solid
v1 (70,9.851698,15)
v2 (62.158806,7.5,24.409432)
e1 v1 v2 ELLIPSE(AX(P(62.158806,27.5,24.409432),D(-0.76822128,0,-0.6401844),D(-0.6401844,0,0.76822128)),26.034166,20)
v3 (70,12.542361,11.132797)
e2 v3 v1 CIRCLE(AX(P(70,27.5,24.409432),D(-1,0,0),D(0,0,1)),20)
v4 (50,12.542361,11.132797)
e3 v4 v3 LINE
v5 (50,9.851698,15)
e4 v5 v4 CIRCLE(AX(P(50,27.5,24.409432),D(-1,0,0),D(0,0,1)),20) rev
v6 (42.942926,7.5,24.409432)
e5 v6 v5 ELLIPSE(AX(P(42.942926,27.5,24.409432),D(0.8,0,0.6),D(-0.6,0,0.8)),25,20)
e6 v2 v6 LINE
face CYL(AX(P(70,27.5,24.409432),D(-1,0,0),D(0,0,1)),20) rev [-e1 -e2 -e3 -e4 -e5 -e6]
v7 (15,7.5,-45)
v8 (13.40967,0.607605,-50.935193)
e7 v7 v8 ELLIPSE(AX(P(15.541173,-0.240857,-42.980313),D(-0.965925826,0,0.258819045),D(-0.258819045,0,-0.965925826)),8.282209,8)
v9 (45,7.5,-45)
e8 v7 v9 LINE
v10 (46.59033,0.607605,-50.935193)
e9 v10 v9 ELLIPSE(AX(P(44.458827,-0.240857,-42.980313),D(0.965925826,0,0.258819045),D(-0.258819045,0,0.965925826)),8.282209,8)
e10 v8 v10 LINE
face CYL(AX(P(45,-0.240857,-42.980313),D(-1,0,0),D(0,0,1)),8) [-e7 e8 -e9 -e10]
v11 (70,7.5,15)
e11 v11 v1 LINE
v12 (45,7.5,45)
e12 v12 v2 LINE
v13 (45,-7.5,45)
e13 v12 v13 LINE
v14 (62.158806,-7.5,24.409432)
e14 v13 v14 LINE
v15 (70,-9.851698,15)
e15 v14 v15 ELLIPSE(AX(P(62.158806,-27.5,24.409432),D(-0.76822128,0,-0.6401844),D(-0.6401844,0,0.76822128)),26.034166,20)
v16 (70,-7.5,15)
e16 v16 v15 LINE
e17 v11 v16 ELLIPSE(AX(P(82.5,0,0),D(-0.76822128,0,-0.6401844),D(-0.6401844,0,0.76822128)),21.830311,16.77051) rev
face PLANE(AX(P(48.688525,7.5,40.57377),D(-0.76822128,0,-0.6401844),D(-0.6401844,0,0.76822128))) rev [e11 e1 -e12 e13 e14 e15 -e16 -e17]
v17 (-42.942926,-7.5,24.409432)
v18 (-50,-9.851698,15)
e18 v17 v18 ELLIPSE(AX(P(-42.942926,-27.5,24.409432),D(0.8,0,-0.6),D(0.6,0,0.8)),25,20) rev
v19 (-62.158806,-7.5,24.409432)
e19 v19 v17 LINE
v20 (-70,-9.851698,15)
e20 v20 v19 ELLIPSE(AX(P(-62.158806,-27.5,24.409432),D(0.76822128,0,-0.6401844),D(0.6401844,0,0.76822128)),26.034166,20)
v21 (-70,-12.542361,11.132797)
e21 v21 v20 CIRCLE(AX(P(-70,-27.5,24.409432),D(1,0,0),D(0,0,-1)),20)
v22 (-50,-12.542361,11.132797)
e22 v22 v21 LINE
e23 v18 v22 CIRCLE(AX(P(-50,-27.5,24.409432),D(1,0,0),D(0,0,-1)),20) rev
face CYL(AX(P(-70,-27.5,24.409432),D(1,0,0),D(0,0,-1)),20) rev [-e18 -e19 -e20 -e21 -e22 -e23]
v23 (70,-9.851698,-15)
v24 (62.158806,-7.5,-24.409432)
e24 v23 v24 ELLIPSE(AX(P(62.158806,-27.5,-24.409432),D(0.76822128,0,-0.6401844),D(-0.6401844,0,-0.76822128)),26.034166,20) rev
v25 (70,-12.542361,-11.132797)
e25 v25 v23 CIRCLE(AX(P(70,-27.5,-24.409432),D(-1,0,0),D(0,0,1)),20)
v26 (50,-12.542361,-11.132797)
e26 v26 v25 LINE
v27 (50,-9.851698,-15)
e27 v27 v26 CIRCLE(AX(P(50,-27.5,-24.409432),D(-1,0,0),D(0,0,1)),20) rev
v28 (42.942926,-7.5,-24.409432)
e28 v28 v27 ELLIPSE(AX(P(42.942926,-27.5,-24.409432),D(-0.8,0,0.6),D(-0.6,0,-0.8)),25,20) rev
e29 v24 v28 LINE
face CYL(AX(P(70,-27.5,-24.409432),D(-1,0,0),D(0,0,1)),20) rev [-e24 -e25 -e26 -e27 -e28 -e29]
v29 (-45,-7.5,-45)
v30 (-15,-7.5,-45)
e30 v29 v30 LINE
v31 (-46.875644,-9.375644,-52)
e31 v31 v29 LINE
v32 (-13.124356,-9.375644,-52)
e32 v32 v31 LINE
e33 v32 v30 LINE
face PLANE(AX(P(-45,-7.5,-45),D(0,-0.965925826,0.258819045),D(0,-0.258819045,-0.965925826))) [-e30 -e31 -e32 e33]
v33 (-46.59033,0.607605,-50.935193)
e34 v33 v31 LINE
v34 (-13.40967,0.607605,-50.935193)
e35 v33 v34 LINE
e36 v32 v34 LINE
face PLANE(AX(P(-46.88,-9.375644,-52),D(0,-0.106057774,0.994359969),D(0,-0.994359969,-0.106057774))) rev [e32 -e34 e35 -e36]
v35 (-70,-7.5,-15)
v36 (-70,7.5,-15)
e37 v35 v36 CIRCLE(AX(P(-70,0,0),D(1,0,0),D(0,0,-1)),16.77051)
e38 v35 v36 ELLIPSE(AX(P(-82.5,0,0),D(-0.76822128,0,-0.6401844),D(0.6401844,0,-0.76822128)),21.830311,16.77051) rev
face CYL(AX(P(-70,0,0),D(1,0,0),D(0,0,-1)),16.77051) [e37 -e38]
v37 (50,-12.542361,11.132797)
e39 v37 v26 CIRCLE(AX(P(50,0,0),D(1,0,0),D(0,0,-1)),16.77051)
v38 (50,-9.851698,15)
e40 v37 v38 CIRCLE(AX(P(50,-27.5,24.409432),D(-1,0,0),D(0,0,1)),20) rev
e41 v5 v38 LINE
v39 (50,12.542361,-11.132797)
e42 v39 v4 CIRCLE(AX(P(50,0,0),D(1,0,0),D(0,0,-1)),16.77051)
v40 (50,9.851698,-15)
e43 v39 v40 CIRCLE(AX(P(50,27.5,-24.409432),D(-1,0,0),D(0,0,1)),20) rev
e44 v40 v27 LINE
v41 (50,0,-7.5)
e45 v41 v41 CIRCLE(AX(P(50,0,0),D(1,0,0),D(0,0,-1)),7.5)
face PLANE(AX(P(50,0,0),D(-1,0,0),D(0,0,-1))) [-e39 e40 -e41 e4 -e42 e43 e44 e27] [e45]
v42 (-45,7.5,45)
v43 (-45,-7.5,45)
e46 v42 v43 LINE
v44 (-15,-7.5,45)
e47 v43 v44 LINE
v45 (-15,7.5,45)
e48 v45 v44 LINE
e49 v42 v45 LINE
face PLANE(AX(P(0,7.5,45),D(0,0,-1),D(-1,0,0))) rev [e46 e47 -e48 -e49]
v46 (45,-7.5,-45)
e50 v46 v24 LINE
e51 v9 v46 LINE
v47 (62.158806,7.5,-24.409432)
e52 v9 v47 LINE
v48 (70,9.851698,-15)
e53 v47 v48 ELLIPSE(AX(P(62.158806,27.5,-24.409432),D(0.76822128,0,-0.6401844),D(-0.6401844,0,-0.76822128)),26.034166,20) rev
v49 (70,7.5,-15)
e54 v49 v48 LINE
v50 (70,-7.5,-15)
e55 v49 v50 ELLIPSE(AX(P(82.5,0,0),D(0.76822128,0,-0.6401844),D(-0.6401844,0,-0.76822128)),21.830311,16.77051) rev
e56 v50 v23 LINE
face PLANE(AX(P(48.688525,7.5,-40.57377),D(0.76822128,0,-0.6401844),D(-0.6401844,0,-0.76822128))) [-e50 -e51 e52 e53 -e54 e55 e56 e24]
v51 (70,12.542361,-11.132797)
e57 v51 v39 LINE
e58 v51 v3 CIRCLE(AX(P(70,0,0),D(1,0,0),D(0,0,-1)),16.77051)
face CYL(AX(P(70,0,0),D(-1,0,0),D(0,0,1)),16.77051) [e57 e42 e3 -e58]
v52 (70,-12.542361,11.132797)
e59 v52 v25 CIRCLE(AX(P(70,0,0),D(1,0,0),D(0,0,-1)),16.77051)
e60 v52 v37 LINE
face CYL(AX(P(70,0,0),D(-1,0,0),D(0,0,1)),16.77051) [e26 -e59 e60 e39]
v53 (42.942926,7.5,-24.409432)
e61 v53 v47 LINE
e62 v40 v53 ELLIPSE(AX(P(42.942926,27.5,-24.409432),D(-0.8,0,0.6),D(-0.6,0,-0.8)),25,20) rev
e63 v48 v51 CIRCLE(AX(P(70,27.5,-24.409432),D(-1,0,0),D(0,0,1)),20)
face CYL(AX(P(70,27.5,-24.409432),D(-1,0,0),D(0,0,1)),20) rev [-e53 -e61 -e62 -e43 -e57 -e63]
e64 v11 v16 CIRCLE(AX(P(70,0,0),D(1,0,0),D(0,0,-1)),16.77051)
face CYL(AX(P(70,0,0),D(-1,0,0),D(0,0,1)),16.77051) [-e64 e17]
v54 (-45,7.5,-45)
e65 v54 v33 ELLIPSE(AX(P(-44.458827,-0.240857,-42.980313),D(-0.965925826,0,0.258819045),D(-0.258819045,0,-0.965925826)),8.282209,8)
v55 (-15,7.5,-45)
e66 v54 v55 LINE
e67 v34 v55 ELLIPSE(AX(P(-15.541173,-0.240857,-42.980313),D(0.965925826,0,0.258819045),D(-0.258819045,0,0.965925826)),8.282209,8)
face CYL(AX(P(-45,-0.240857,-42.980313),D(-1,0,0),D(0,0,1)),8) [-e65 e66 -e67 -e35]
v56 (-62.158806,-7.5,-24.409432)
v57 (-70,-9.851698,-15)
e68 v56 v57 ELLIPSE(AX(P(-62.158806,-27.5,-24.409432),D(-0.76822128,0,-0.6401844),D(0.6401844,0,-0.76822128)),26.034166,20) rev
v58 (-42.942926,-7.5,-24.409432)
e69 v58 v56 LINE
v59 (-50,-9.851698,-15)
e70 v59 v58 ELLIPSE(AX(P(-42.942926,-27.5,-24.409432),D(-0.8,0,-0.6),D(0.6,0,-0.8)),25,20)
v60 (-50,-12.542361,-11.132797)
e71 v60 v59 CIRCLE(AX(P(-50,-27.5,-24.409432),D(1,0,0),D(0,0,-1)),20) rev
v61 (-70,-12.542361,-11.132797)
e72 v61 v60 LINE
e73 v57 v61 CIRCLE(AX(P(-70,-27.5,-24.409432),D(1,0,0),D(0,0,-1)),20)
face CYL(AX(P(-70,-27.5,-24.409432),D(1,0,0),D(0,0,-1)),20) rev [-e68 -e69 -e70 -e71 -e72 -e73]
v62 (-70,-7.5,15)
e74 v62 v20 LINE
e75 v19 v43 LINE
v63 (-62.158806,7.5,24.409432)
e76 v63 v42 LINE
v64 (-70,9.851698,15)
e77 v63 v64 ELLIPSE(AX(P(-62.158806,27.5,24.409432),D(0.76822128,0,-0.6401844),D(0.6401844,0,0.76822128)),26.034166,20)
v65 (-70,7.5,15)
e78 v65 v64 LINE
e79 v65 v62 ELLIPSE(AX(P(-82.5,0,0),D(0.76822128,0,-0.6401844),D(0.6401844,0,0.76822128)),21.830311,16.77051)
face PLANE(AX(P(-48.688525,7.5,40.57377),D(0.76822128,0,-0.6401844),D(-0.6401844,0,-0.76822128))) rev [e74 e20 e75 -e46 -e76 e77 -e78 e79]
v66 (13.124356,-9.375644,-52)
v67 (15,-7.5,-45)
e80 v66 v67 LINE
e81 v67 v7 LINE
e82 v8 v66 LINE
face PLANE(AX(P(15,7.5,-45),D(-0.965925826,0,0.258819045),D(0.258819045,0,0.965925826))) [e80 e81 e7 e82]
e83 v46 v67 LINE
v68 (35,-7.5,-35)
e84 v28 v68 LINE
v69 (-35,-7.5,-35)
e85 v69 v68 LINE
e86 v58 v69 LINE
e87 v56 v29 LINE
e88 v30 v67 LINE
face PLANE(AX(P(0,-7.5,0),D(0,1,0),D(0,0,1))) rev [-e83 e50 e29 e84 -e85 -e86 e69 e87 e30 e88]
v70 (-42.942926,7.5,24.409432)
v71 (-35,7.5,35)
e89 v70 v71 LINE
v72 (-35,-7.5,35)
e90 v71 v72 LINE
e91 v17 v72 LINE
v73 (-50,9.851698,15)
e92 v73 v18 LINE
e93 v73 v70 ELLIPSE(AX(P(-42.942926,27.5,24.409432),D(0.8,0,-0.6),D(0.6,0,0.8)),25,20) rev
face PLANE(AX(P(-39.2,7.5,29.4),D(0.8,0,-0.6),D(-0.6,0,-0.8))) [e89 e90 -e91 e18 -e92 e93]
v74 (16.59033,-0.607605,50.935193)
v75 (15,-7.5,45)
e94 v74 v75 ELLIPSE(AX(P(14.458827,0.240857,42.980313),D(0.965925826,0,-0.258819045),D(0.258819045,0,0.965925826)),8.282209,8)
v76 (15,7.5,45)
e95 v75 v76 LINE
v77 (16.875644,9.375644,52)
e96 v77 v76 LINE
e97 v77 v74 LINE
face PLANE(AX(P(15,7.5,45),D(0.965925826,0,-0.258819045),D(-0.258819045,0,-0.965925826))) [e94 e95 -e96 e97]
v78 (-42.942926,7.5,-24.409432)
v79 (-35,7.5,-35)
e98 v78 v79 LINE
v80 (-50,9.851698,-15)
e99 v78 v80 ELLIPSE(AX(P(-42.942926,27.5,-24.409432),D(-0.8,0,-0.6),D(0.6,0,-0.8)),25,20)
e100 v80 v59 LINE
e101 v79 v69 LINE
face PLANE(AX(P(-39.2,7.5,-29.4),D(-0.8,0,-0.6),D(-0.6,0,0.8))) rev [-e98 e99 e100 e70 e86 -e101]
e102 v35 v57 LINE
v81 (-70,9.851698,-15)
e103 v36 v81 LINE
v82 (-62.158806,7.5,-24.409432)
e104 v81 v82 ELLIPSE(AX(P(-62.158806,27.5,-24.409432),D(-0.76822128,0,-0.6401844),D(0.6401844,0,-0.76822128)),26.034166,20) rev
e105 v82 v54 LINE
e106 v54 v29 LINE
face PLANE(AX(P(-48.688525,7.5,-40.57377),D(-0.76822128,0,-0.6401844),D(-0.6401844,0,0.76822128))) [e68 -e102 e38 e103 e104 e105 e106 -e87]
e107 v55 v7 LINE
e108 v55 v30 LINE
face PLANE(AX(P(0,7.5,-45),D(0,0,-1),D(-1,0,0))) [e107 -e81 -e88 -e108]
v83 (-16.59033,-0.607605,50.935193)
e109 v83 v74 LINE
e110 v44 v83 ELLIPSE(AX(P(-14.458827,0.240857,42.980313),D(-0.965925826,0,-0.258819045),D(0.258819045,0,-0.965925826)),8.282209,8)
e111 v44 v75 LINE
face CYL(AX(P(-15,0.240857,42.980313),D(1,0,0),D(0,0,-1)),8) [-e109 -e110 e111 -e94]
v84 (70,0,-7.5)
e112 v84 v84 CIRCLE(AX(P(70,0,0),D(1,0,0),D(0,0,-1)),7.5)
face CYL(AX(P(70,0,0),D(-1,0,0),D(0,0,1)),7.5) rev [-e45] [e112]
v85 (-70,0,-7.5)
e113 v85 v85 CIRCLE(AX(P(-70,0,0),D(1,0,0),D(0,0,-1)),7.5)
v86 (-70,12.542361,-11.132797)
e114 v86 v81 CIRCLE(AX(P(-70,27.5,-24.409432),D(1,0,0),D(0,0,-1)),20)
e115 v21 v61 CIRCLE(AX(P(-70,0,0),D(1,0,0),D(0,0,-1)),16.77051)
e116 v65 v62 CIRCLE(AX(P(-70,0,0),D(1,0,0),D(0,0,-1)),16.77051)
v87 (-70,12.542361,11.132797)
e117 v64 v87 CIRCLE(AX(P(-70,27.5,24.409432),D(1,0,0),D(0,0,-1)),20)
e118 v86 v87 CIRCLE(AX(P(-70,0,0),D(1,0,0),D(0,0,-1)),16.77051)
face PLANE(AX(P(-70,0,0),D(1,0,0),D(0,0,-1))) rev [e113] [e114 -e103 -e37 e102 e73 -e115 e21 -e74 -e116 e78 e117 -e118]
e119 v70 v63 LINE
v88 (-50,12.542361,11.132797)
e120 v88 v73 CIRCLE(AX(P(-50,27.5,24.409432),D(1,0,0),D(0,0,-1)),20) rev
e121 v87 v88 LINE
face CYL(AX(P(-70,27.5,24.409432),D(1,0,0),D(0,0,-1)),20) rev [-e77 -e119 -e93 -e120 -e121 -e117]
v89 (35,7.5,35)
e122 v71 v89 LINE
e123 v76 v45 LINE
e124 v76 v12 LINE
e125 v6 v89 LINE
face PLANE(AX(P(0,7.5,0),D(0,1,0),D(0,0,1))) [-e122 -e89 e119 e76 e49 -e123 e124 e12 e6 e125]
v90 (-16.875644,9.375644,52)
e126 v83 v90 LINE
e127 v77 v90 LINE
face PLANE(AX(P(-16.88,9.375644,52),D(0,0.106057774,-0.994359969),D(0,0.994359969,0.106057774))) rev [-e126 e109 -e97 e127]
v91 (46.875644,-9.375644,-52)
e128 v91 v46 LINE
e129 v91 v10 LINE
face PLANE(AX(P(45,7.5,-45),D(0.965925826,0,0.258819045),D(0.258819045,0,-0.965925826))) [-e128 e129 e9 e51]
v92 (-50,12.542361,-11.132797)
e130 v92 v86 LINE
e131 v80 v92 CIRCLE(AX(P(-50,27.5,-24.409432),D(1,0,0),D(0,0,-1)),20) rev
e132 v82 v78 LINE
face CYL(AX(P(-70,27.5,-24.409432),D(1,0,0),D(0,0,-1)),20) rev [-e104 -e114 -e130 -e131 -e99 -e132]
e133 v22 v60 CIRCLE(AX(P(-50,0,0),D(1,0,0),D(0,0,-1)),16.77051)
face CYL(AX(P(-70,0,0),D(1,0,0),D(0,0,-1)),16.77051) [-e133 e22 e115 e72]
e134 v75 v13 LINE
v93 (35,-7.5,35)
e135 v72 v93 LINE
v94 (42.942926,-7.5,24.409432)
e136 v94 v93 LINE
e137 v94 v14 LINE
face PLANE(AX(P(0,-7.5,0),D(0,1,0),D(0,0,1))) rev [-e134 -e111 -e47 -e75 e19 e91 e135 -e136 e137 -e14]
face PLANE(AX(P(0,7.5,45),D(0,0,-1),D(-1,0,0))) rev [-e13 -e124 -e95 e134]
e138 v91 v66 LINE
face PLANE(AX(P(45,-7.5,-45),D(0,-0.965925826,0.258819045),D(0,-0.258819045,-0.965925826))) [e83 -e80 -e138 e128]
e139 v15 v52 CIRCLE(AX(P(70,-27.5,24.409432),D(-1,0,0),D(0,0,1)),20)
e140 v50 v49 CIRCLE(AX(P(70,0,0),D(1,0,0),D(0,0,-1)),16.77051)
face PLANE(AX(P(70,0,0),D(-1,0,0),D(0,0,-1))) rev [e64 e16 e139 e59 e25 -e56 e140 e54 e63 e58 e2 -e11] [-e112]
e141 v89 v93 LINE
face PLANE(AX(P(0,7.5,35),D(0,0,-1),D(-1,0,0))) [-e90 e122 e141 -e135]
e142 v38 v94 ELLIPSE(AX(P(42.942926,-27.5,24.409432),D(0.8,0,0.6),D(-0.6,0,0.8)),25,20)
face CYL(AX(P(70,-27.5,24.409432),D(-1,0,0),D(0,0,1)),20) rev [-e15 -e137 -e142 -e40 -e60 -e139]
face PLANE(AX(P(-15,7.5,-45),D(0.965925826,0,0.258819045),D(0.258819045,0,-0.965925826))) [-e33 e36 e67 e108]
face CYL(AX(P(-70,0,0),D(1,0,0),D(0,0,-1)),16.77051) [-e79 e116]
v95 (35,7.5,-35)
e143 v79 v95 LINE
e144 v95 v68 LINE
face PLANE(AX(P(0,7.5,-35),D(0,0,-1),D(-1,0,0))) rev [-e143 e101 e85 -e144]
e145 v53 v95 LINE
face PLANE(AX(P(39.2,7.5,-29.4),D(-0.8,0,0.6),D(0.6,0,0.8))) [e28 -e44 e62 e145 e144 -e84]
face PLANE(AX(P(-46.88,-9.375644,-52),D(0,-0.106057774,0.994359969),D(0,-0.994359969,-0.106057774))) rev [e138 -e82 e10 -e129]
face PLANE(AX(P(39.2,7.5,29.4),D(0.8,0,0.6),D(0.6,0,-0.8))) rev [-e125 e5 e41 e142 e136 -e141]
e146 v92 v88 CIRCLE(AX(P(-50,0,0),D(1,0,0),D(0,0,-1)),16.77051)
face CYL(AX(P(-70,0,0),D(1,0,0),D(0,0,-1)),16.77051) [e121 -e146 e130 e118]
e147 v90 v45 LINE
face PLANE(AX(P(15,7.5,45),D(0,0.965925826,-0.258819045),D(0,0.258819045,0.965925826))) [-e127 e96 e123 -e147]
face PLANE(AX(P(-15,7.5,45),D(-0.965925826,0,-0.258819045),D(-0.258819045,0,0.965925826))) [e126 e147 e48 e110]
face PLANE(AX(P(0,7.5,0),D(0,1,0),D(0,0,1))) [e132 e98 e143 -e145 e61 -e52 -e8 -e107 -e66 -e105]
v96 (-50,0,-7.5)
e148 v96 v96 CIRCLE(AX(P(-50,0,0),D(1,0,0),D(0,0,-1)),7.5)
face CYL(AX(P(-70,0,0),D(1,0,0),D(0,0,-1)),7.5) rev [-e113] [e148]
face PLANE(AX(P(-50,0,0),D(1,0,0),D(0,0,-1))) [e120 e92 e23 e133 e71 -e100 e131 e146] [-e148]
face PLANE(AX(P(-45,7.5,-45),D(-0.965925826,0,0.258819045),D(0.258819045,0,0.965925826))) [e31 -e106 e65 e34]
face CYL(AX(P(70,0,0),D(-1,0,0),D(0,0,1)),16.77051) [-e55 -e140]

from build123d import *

# Parameters (mm, degrees)
RESSALTO_EXTRUS_O1_DEPTH           = 7.5
RESSALTO_EXTRUS_O1_2_DEPTH         = 7.5
ESBO_O2_R                          = 16.770509831
ESBO_O2_R_2                        = 7.5
RESSALTO_EXTRUS_O2_DEPTH           = 20
FILETE1_R                          = 20
ESBO_O3_W                          = 30
ESBO_O3_H                          = 15
RESSALTO_EXTRUS_O3_DEPTH           = 7
RESSALTO_EXTRUS_O3_DRAFT           = -15
ESBO_O4_W                          = 30
ESBO_O4_H                          = 15
RESSALTO_EXTRUS_O4_DEPTH           = 7
RESSALTO_EXTRUS_O4_DRAFT           = -15
RESSALTO_EXTRUS_O4_PROFILE_2_DEPTH = 7
RESSALTO_EXTRUS_O4_PROFILE_2_DRAFT = -15
CORTE_EXTRUS_O1_DEPTH              = 16.88
CORTE_EXTRUS_O2_DEPTH              = 46.88
FILETE4_R                          = 8


with BuildPart() as part:
    # Esboço1 → Ressalto-extrusão1 (new, symmetric)
    with BuildSketch(Plane(origin=(0, 0, 0), x_dir=(1, 0, 0), z_dir=(0, 1, 0))):
        Polygon((45, -45), (70, -15), (50, -15), (35, -35), (-35, -35), (-50, -15), (-70, -15), (-45, -45), align=None)
    extrude(amount=RESSALTO_EXTRUS_O1_DEPTH, both=True)



with BuildPart() as body_2:
    # Esboço1 → Ressalto-extrus_o1 2 (new, symmetric)
    with BuildSketch(Plane(origin=(0, 0, 0), x_dir=(1, 0, 0), z_dir=(0, 1, 0))):
        Polygon((70, 15), (50, 15), (35, 35), (-35, 35), (-50, 15), (-70, 15), (-45, 45), (45, 45), align=None)
    extrude(amount=RESSALTO_EXTRUS_O1_2_DEPTH, both=True)


with BuildPart() as part_1:
    add(part.part)

    add(body_2.part)  # Ressalto-extrusão2 merges body 2
    # Esboço2 → Ressalto-extrusão2 (add)
    with BuildSketch(Plane(origin=(-50, 0, 0), x_dir=(0, 0, -1), z_dir=(1, 0, 0))):
        Circle(ESBO_O2_R)
        Circle(ESBO_O2_R_2, mode=Mode.SUBTRACT)
    ressalto_extrus_o2 = extrude(amount=-RESSALTO_EXTRUS_O2_DEPTH)

    # Espelhar1: Ressalto-extrusão2 across plane
    add(ressalto_extrus_o2.mirror(Plane(origin=(0, 0, 0), x_dir=(0, 0, 1), z_dir=(1, 0, 0))))

    # Filete1
    # the kernel refuses this fillet: 20 mm, written as the material it adds along each edge
    with BuildSketch(Plane(origin=(70, -7.5, 15), x_dir=(0, 0, 1), z_dir=(-1, 0, 0))) as filete1_piece_1_section:
        with BuildLine():
            CenterArc((9.409432465, -20), FILETE1_R, 90, 41.59276394)
            ThreePointArc((-3.867202848, -5.042361324), (-1.692591399, -2.706021572), (0, 0))
            Line((0, 0), (9.409432465, 0))
        make_face()
    filete1_piece_1 = extrude(amount=20, mode=Mode.PRIVATE)
    filete1_piece_1 = split(filete1_piece_1, bisect_by=Plane(origin=(64.976467601, -8.579836869, 21.028238879), z_dir=(-0.7682212795973759, 0, -0.6401843996644799)), keep=Keep.TOP, mode=Mode.PRIVATE)
    filete1_piece_1 = split(filete1_piece_1, bisect_by=Plane(origin=(52.72088695, -8.579836869, 11.372150733), z_dir=(0.7999999999999996, 0, 0.6000000000000005)), keep=Keep.TOP, mode=Mode.PRIVATE)
    add(filete1_piece_1)
    with BuildSketch(Plane(origin=(70, -7.5, 15), x_dir=(0, 0, 1), z_dir=(-1, 0, 0))) as filete1_piece_2_section:
        with BuildLine():
            CenterArc((9.409432465, -20), FILETE1_R, 90, 41.59276394)
            ThreePointArc((-3.867202848, -5.042361324), (-1.692591399, -2.706021572), (0, 0))
            Line((0, 0), (9.409432465, 0))
        make_face()
    filete1_piece_2 = extrude(amount=20, mode=Mode.PRIVATE)
    filete1_piece_2 = split(filete1_piece_2, bisect_by=Plane(origin=(51.352262371, -10.660732835, 13.196983505), z_dir=(-0.7999999999999996, 0, -0.6000000000000005)), keep=Keep.TOP, mode=Mode.PRIVATE)
    add(filete1_piece_2)
    with BuildSketch(Plane(origin=(70, -7.5, 15), x_dir=(0, 0, 1), z_dir=(-1, 0, 0))) as filete1_piece_3_section:
        with BuildLine():
            CenterArc((9.409432465, -20), FILETE1_R, 90, 41.59276394)
            ThreePointArc((-3.867202848, -5.042361324), (-1.692591399, -2.706021572), (0, 0))
            Line((0, 0), (9.409432465, 0))
        make_face()
    filete1_piece_3 = extrude(amount=43.523581162, mode=Mode.PRIVATE)
    filete1_piece_3 = split(filete1_piece_3, bisect_by=Plane(origin=(46.899144186, -7.62078926, 19.134474419), z_dir=(0.7999999999999996, 0, 0.6000000000000005)), keep=Keep.TOP, mode=Mode.PRIVATE)
    filete1_piece_3 = split(filete1_piece_3, bisect_by=Plane(origin=(50, -7.62078926, 20.042041974), z_dir=(-1, 0, 0)), keep=Keep.TOP, mode=Mode.PRIVATE)
    add(filete1_piece_3)
    with BuildSketch(Plane(origin=(-26.476418838, 7.5, 15), x_dir=(0, 0.7935005396361219, -0.6085695470504449), z_dir=(-1, 0, 0))) as filete1_piece_4_section:
        with BuildLine():
            CenterArc((10.14371674, -19.637780679), FILETE1_R, 100.921092441, 41.59276394)
            Line((-5.726294053, -7.466389738), (0, 0))
            ThreePointArc((0, 0), (3.177289158, -0.303730134), (6.354578317, 0))
        make_face()
    filete1_piece_4 = extrude(amount=43.523581162, mode=Mode.PRIVATE)
    filete1_piece_4 = split(filete1_piece_4, bisect_by=Plane(origin=(-50, 7.62078926, 20.042041974), z_dir=(1, 0, 0)), keep=Keep.TOP, mode=Mode.PRIVATE)
    filete1_piece_4 = split(filete1_piece_4, bisect_by=Plane(origin=(-46.899144186, 7.62078926, 19.134474419), z_dir=(-0.7999999999999992, 0, 0.6000000000000011)), keep=Keep.TOP, mode=Mode.PRIVATE)
    add(filete1_piece_4)
    with BuildSketch(Plane(origin=(-50, 7.5, 15), x_dir=(0, 0.7935005396361215, -0.6085695470504452), z_dir=(-1, 0, 0))) as filete1_piece_5_section:
        with BuildLine():
            CenterArc((10.14371674, -19.637780679), FILETE1_R, 100.921092441, 41.59276394)
            Line((-5.726294053, -7.466389738), (0, 0))
            ThreePointArc((0, 0), (3.177289158, -0.303730134), (6.354578317, 0))
        make_face()
    filete1_piece_5 = extrude(amount=20, mode=Mode.PRIVATE)
    filete1_piece_5 = split(filete1_piece_5, bisect_by=Plane(origin=(-51.352262371, 10.660732835, 13.196983505), z_dir=(0.7999999999999992, 0, -0.6000000000000011)), keep=Keep.TOP, mode=Mode.PRIVATE)
    add(filete1_piece_5)
    with BuildSketch(Plane(origin=(-50, 7.5, 15), x_dir=(0, 0.7935005396361215, -0.6085695470504452), z_dir=(-1, 0, 0))) as filete1_piece_6_section:
        with BuildLine():
            CenterArc((10.14371674, -19.637780679), FILETE1_R, 100.921092441, 41.59276394)
            Line((-5.726294053, -7.466389738), (0, 0))
            ThreePointArc((0, 0), (3.177289158, -0.303730134), (6.354578317, 0))
        make_face()
    filete1_piece_6 = extrude(amount=20, mode=Mode.PRIVATE)
    filete1_piece_6 = split(filete1_piece_6, bisect_by=Plane(origin=(-64.976467601, 8.579836869, 21.028238879), z_dir=(0.7682212795973756, 0, -0.6401843996644802)), keep=Keep.TOP, mode=Mode.PRIVATE)
    filete1_piece_6 = split(filete1_piece_6, bisect_by=Plane(origin=(-52.72088695, 8.579836869, 11.372150733), z_dir=(-0.7999999999999992, 0, 0.6000000000000011)), keep=Keep.TOP, mode=Mode.PRIVATE)
    add(filete1_piece_6)
    with BuildSketch(Plane(origin=(70, 7.5, -15), x_dir=(0, 0.7935005396361229, 0.6085695470504434), z_dir=(-1, 0, 0))) as filete1_piece_7_section:
        with BuildLine():
            CenterArc((10.14371674, 19.637780679), FILETE1_R, 217.486143619, 41.59276394)
            Line((-5.726294053, 7.466389738), (0, 0))
            ThreePointArc((0, 0), (3.177289158, 0.303730134), (6.354578317, 0))
        make_face()
    filete1_piece_7 = extrude(amount=20, mode=Mode.PRIVATE)
    filete1_piece_7 = split(filete1_piece_7, bisect_by=Plane(origin=(52.72088695, 8.579836869, -11.372150733), z_dir=(0.7999999999999996, 0, -0.6000000000000005)), keep=Keep.TOP, mode=Mode.PRIVATE)
    filete1_piece_7 = split(filete1_piece_7, bisect_by=Plane(origin=(64.976467601, 8.579836869, -21.028238879), z_dir=(-0.7682212795973757, 0, 0.6401843996644802)), keep=Keep.TOP, mode=Mode.PRIVATE)
    add(filete1_piece_7)
    with BuildSketch(Plane(origin=(70, 7.5, -15), x_dir=(0, 0.7935005396361229, 0.6085695470504434), z_dir=(-1, 0, 0))) as filete1_piece_8_section:
        with BuildLine():
            CenterArc((10.14371674, 19.637780679), FILETE1_R, 217.486143619, 41.59276394)
            Line((-5.726294053, 7.466389738), (0, 0))
            ThreePointArc((0, 0), (3.177289158, 0.303730134), (6.354578317, 0))
        make_face()
    filete1_piece_8 = extrude(amount=43.523581162, mode=Mode.PRIVATE)
    filete1_piece_8 = split(filete1_piece_8, bisect_by=Plane(origin=(46.899144186, 7.62078926, -19.134474419), z_dir=(0.7999999999999996, 0, -0.6000000000000005)), keep=Keep.TOP, mode=Mode.PRIVATE)
    filete1_piece_8 = split(filete1_piece_8, bisect_by=Plane(origin=(50, 7.62078926, -20.042041974), z_dir=(-1, 0, 0)), keep=Keep.TOP, mode=Mode.PRIVATE)
    add(filete1_piece_8)
    with BuildSketch(Plane(origin=(70, 7.5, -15), x_dir=(0, 0.7935005396361229, 0.6085695470504434), z_dir=(-1, 0, 0))) as filete1_piece_9_section:
        with BuildLine():
            CenterArc((10.14371674, 19.637780679), FILETE1_R, 217.486143619, 41.59276394)
            Line((-5.726294053, 7.466389738), (0, 0))
            ThreePointArc((0, 0), (3.177289158, 0.303730134), (6.354578317, 0))
        make_face()
    filete1_piece_9 = extrude(amount=20, mode=Mode.PRIVATE)
    filete1_piece_9 = split(filete1_piece_9, bisect_by=Plane(origin=(51.352262371, 10.660732835, -13.196983505), z_dir=(-0.7999999999999996, 0, 0.6000000000000005)), keep=Keep.TOP, mode=Mode.PRIVATE)
    add(filete1_piece_9)
    with BuildSketch(Plane(origin=(-50, 7.5, -15), x_dir=(0, 0, -1), z_dir=(-1, 0, 0))) as filete1_piece_10_section:
        with BuildLine():
            CenterArc((9.409432465, -20), FILETE1_R, 90, 41.59276394)
            ThreePointArc((-3.867202848, -5.042361324), (-1.692591399, -2.706021572), (0, 0))
            Line((0, 0), (9.409432465, 0))
        make_face()
    filete1_piece_10 = extrude(amount=20, mode=Mode.PRIVATE)
    filete1_piece_10 = split(filete1_piece_10, bisect_by=Plane(origin=(-51.352262371, 10.660732835, -13.196983505), z_dir=(0.7999999999999999, 0, 0.6000000000000002)), keep=Keep.TOP, mode=Mode.PRIVATE)
    add(filete1_piece_10)
    with BuildSketch(Plane(origin=(-26.476418838, 7.5, -15), x_dir=(0, 0, -1), z_dir=(-1, 0, 0))) as filete1_piece_11_section:
        with BuildLine():
            CenterArc((9.409432465, -20), FILETE1_R, 90, 41.59276394)
            ThreePointArc((-3.867202848, -5.042361324), (-1.692591399, -2.706021572), (0, 0))
            Line((0, 0), (9.409432465, 0))
        make_face()
    filete1_piece_11 = extrude(amount=43.523581162, mode=Mode.PRIVATE)
    filete1_piece_11 = split(filete1_piece_11, bisect_by=Plane(origin=(-50, 7.62078926, -20.042041974), z_dir=(1, 0, 0)), keep=Keep.TOP, mode=Mode.PRIVATE)
    filete1_piece_11 = split(filete1_piece_11, bisect_by=Plane(origin=(-46.899144186, 7.62078926, -19.134474419), z_dir=(-0.7999999999999999, 0, -0.6000000000000002)), keep=Keep.TOP, mode=Mode.PRIVATE)
    add(filete1_piece_11)
    with BuildSketch(Plane(origin=(-50, 7.5, -15), x_dir=(0, 0, -1), z_dir=(-1, 0, 0))) as filete1_piece_12_section:
        with BuildLine():
            CenterArc((9.409432465, -20), FILETE1_R, 90, 41.59276394)
            ThreePointArc((-3.867202848, -5.042361324), (-1.692591399, -2.706021572), (0, 0))
            Line((0, 0), (9.409432465, 0))
        make_face()
    filete1_piece_12 = extrude(amount=20, mode=Mode.PRIVATE)
    filete1_piece_12 = split(filete1_piece_12, bisect_by=Plane(origin=(-52.72088695, 8.579836869, -11.372150733), z_dir=(-0.7999999999999999, 0, -0.6000000000000002)), keep=Keep.TOP, mode=Mode.PRIVATE)
    filete1_piece_12 = split(filete1_piece_12, bisect_by=Plane(origin=(-64.976467601, 8.579836869, -21.028238879), z_dir=(0.7682212795973755, 0, 0.6401843996644803)), keep=Keep.TOP, mode=Mode.PRIVATE)
    add(filete1_piece_12)
    with BuildSketch(Plane(origin=(70, -7.5, -15), x_dir=(0, 0, -1), z_dir=(-1, 0, 0))) as filete1_piece_13_section:
        with BuildLine():
            CenterArc((9.409432465, 20), FILETE1_R, 228.40723606, 41.59276394)
            ThreePointArc((-3.867202848, 5.042361324), (-1.692591399, 2.706021572), (0, 0))
            Line((0, 0), (9.409432465, 0))
        make_face()
    filete1_piece_13 = extrude(amount=20, mode=Mode.PRIVATE)
    filete1_piece_13 = split(filete1_piece_13, bisect_by=Plane(origin=(52.72088695, -8.579836869, -11.372150733), z_dir=(0.7999999999999996, 0, -0.6000000000000005)), keep=Keep.TOP, mode=Mode.PRIVATE)
    filete1_piece_13 = split(filete1_piece_13, bisect_by=Plane(origin=(64.976467601, -8.579836869, -21.028238879), z_dir=(-0.7682212795973757, 0, 0.6401843996644802)), keep=Keep.TOP, mode=Mode.PRIVATE)
    add(filete1_piece_13)
    with BuildSketch(Plane(origin=(70, -7.5, -15), x_dir=(0, 0, -1), z_dir=(-1, 0, 0))) as filete1_piece_14_section:
        with BuildLine():
            CenterArc((9.409432465, 20), FILETE1_R, 228.40723606, 41.59276394)
            ThreePointArc((-3.867202848, 5.042361324), (-1.692591399, 2.706021572), (0, 0))
            Line((0, 0), (9.409432465, 0))
        make_face()
    filete1_piece_14 = extrude(amount=20, mode=Mode.PRIVATE)
    filete1_piece_14 = split(filete1_piece_14, bisect_by=Plane(origin=(51.352262371, -10.660732835, -13.196983505), z_dir=(-0.7999999999999996, 0, 0.6000000000000005)), keep=Keep.TOP, mode=Mode.PRIVATE)
    add(filete1_piece_14)
    with BuildSketch(Plane(origin=(70, -7.5, -15), x_dir=(0, 0, -1), z_dir=(-1, 0, 0))) as filete1_piece_15_section:
        with BuildLine():
            CenterArc((9.409432465, 20), FILETE1_R, 228.40723606, 41.59276394)
            ThreePointArc((-3.867202848, 5.042361324), (-1.692591399, 2.706021572), (0, 0))
            Line((0, 0), (9.409432465, 0))
        make_face()
    filete1_piece_15 = extrude(amount=43.523581162, mode=Mode.PRIVATE)
    filete1_piece_15 = split(filete1_piece_15, bisect_by=Plane(origin=(46.899144186, -7.62078926, -19.134474419), z_dir=(0.7999999999999996, 0, -0.6000000000000005)), keep=Keep.TOP, mode=Mode.PRIVATE)
    filete1_piece_15 = split(filete1_piece_15, bisect_by=Plane(origin=(50, -7.62078926, -20.042041974), z_dir=(-1, 0, 0)), keep=Keep.TOP, mode=Mode.PRIVATE)
    add(filete1_piece_15)
    with BuildSketch(Plane(origin=(-50, -7.5, -15), x_dir=(0, 0, -1), z_dir=(-1, 0, 0))) as filete1_piece_16_section:
        with BuildLine():
            CenterArc((9.409432465, 20), FILETE1_R, 228.40723606, 41.59276394)
            ThreePointArc((-3.867202848, 5.042361324), (-1.692591399, 2.706021572), (0, 0))
            Line((0, 0), (9.409432465, 0))
        make_face()
    filete1_piece_16 = extrude(amount=20, mode=Mode.PRIVATE)
    filete1_piece_16 = split(filete1_piece_16, bisect_by=Plane(origin=(-51.352262371, -10.660732835, -13.196983505), z_dir=(0.7999999999999999, 0, 0.6000000000000002)), keep=Keep.TOP, mode=Mode.PRIVATE)
    add(filete1_piece_16)
    with BuildSketch(Plane(origin=(-26.476418838, -7.5, -15), x_dir=(0, 0, -1), z_dir=(-1, 0, 0))) as filete1_piece_17_section:
        with BuildLine():
            CenterArc((9.409432465, 20), FILETE1_R, 228.40723606, 41.59276394)
            ThreePointArc((-3.867202848, 5.042361324), (-1.692591399, 2.706021572), (0, 0))
            Line((0, 0), (9.409432465, 0))
        make_face()
    filete1_piece_17 = extrude(amount=43.523581162, mode=Mode.PRIVATE)
    filete1_piece_17 = split(filete1_piece_17, bisect_by=Plane(origin=(-50, -7.62078926, -20.042041974), z_dir=(1, 0, 0)), keep=Keep.TOP, mode=Mode.PRIVATE)
    filete1_piece_17 = split(filete1_piece_17, bisect_by=Plane(origin=(-46.899144186, -7.62078926, -19.134474419), z_dir=(-0.7999999999999999, 0, -0.6000000000000002)), keep=Keep.TOP, mode=Mode.PRIVATE)
    add(filete1_piece_17)
    with BuildSketch(Plane(origin=(-50, -7.5, -15), x_dir=(0, 0, -1), z_dir=(-1, 0, 0))) as filete1_piece_18_section:
        with BuildLine():
            CenterArc((9.409432465, 20), FILETE1_R, 228.40723606, 41.59276394)
            ThreePointArc((-3.867202848, 5.042361324), (-1.692591399, 2.706021572), (0, 0))
            Line((0, 0), (9.409432465, 0))
        make_face()
    filete1_piece_18 = extrude(amount=20, mode=Mode.PRIVATE)
    filete1_piece_18 = split(filete1_piece_18, bisect_by=Plane(origin=(-52.72088695, -8.579836869, -11.372150733), z_dir=(-0.7999999999999999, 0, -0.6000000000000002)), keep=Keep.TOP, mode=Mode.PRIVATE)
    filete1_piece_18 = split(filete1_piece_18, bisect_by=Plane(origin=(-64.976467601, -8.579836869, -21.028238879), z_dir=(0.7682212795973755, 0, 0.6401843996644803)), keep=Keep.TOP, mode=Mode.PRIVATE)
    add(filete1_piece_18)
    with BuildSketch(Plane(origin=(70, 7.5, 15), x_dir=(0, 0.7935005396361229, -0.6085695470504434), z_dir=(-1, 0, 0))) as filete1_piece_19_section:
        with BuildLine():
            CenterArc((10.14371674, -19.637780679), FILETE1_R, 100.921092441, 41.59276394)
            Line((-5.726294053, -7.466389738), (0, 0))
            ThreePointArc((0, 0), (3.177289158, -0.303730134), (6.354578317, 0))
        make_face()
    filete1_piece_19 = extrude(amount=20, mode=Mode.PRIVATE)
    filete1_piece_19 = split(filete1_piece_19, bisect_by=Plane(origin=(64.976467601, 8.579836869, 21.028238879), z_dir=(-0.7682212795973759, 0, -0.6401843996644799)), keep=Keep.TOP, mode=Mode.PRIVATE)
    filete1_piece_19 = split(filete1_piece_19, bisect_by=Plane(origin=(52.72088695, 8.579836869, 11.372150733), z_dir=(0.7999999999999996, 0, 0.6000000000000005)), keep=Keep.TOP, mode=Mode.PRIVATE)
    add(filete1_piece_19)
    with BuildSketch(Plane(origin=(70, 7.5, 15), x_dir=(0, 0.7935005396361229, -0.6085695470504434), z_dir=(-1, 0, 0))) as filete1_piece_20_section:
        with BuildLine():
            CenterArc((10.14371674, -19.637780679), FILETE1_R, 100.921092441, 41.59276394)
            Line((-5.726294053, -7.466389738), (0, 0))
            ThreePointArc((0, 0), (3.177289158, -0.303730134), (6.354578317, 0))
        make_face()
    filete1_piece_20 = extrude(amount=43.523581162, mode=Mode.PRIVATE)
    filete1_piece_20 = split(filete1_piece_20, bisect_by=Plane(origin=(50, 7.62078926, 20.042041974), z_dir=(-1, 0, 0)), keep=Keep.TOP, mode=Mode.PRIVATE)
    filete1_piece_20 = split(filete1_piece_20, bisect_by=Plane(origin=(46.899144186, 7.62078926, 19.134474419), z_dir=(0.7999999999999996, 0, 0.6000000000000005)), keep=Keep.TOP, mode=Mode.PRIVATE)
    add(filete1_piece_20)
    with BuildSketch(Plane(origin=(70, 7.5, 15), x_dir=(0, 0.7935005396361229, -0.6085695470504434), z_dir=(-1, 0, 0))) as filete1_piece_21_section:
        with BuildLine():
            CenterArc((10.14371674, -19.637780679), FILETE1_R, 100.921092441, 41.59276394)
            Line((-5.726294053, -7.466389738), (0, 0))
            ThreePointArc((0, 0), (3.177289158, -0.303730134), (6.354578317, 0))
        make_face()
    filete1_piece_21 = extrude(amount=20, mode=Mode.PRIVATE)
    filete1_piece_21 = split(filete1_piece_21, bisect_by=Plane(origin=(51.352262371, 10.660732835, 13.196983505), z_dir=(-0.7999999999999996, 0, -0.6000000000000005)), keep=Keep.TOP, mode=Mode.PRIVATE)
    add(filete1_piece_21)
    with BuildSketch(Plane(origin=(-50, -7.5, 15), x_dir=(0, 0, 1), z_dir=(-1, 0, 0))) as filete1_piece_22_section:
        with BuildLine():
            CenterArc((9.409432465, -20), FILETE1_R, 90, 41.59276394)
            ThreePointArc((-3.867202848, -5.042361324), (-1.692591399, -2.706021572), (0, 0))
            Line((0, 0), (9.409432465, 0))
        make_face()
    filete1_piece_22 = extrude(amount=20, mode=Mode.PRIVATE)
    filete1_piece_22 = split(filete1_piece_22, bisect_by=Plane(origin=(-51.352262371, -10.660732835, 13.196983505), z_dir=(0.7999999999999992, 0, -0.6000000000000011)), keep=Keep.TOP, mode=Mode.PRIVATE)
    add(filete1_piece_22)
    with BuildSketch(Plane(origin=(-26.476418838, -7.5, 15), x_dir=(0, 0, 1), z_dir=(-1, 0, 0))) as filete1_piece_23_section:
        with BuildLine():
            CenterArc((9.409432465, -20), FILETE1_R, 90, 41.59276394)
            ThreePointArc((-3.867202848, -5.042361324), (-1.692591399, -2.706021572), (0, 0))
            Line((0, 0), (9.409432465, 0))
        make_face()
    filete1_piece_23 = extrude(amount=43.523581162, mode=Mode.PRIVATE)
    filete1_piece_23 = split(filete1_piece_23, bisect_by=Plane(origin=(-46.899144186, -7.62078926, 19.134474419), z_dir=(-0.7999999999999992, 0, 0.6000000000000011)), keep=Keep.TOP, mode=Mode.PRIVATE)
    filete1_piece_23 = split(filete1_piece_23, bisect_by=Plane(origin=(-50, -7.62078926, 20.042041974), z_dir=(1, 0, 0)), keep=Keep.TOP, mode=Mode.PRIVATE)
    add(filete1_piece_23)
    with BuildSketch(Plane(origin=(-50, -7.5, 15), x_dir=(0, 0, 1), z_dir=(-1, 0, 0))) as filete1_piece_24_section:
        with BuildLine():
            CenterArc((9.409432465, -20), FILETE1_R, 90, 41.59276394)
            ThreePointArc((-3.867202848, -5.042361324), (-1.692591399, -2.706021572), (0, 0))
            Line((0, 0), (9.409432465, 0))
        make_face()
    filete1_piece_24 = extrude(amount=20, mode=Mode.PRIVATE)
    filete1_piece_24 = split(filete1_piece_24, bisect_by=Plane(origin=(-52.72088695, -8.579836869, 11.372150733), z_dir=(-0.7999999999999992, 0, 0.6000000000000011)), keep=Keep.TOP, mode=Mode.PRIVATE)
    filete1_piece_24 = split(filete1_piece_24, bisect_by=Plane(origin=(-64.976467601, -8.579836869, 21.028238879), z_dir=(0.7682212795973756, 0, -0.6401843996644802)), keep=Keep.TOP, mode=Mode.PRIVATE)
    add(filete1_piece_24)


with BuildPart() as ressalto_extrus_o3_tool:
    # Esboço3 → Ressalto-extrusão3 (with draft: the straight prism first)
    with BuildSketch(Plane.XY.offset(45)):
        Rectangle(ESBO_O3_W, ESBO_O3_H)
    extrude(amount=RESSALTO_EXTRUS_O3_DEPTH)
    # Ressalto-extrusão3: the draft: its side faces are tilted about the plane it starts from
    ressalto_extrus_o3_sides = [ressalto_extrus_o3_tool.faces().sort_by_distance(p)[0] for p in [
        (0, -7.5, 48.5),
        (15, 0, 48.5),
        (0, 7.5, 48.5),
        (-15, 0, 48.5),
    ]]
    draft(ressalto_extrus_o3_sides, Plane.XY.offset(45), RESSALTO_EXTRUS_O3_DRAFT)


with BuildPart() as part_2:
    add(part_1.part)

    # Ressalto-extrusão3: add ressalto_extrus_o3_tool
    add(ressalto_extrus_o3_tool.part)


with BuildPart() as ressalto_extrus_o4_tool:
    # Esboço4 → Ressalto-extrusão4 (with draft: the straight prism first)
    with BuildSketch(Plane(origin=(0, 0, -45), x_dir=(-1, 0, 0), z_dir=(0, 0, -1))):
        with Locations((-30, 0)):
            Rectangle(ESBO_O4_W, ESBO_O4_H)
    extrude(amount=RESSALTO_EXTRUS_O4_DEPTH)
    # Ressalto-extrusão4: the draft: its side faces are tilted about the plane it starts from
    ressalto_extrus_o4_sides = [ressalto_extrus_o4_tool.faces().sort_by_distance(p)[0] for p in [
        (45, 0, -48.5),
        (30, -7.5, -48.5),
        (15, 0, -48.5),
        (30, 7.5, -48.5),
    ]]
    draft(ressalto_extrus_o4_sides, Plane(origin=(0, 0, -45), x_dir=(-1, 0, 0), z_dir=(0, 0, -1)), RESSALTO_EXTRUS_O4_DRAFT)


with BuildPart() as part_3:
    add(part_2.part)

    # Ressalto-extrusão4: add ressalto_extrus_o4_tool
    add(ressalto_extrus_o4_tool.part)


with BuildPart() as ressalto_extrus_o4_profile_2_tool:
    # Esboço4 → Ressalto-extrusão4 profile 2 (with draft: the straight prism first)
    with BuildSketch(Plane(origin=(0, 0, -45), x_dir=(-1, 0, 0), z_dir=(0, 0, -1))):
        with Locations((30, 0)):
            Rectangle(ESBO_O4_W, ESBO_O4_H)
    extrude(amount=RESSALTO_EXTRUS_O4_PROFILE_2_DEPTH)
    # Ressalto-extrusão4 profile 2: the draft: its side faces are tilted about the plane it starts from
    ressalto_extrus_o4_profile_2_sides = [ressalto_extrus_o4_profile_2_tool.faces().sort_by_distance(p)[0] for p in [
        (-15, 0, -48.5),
        (-30, -7.5, -48.5),
        (-45, 0, -48.5),
        (-30, 7.5, -48.5),
    ]]
    draft(ressalto_extrus_o4_profile_2_sides, Plane(origin=(0, 0, -45), x_dir=(-1, 0, 0), z_dir=(0, 0, -1)), RESSALTO_EXTRUS_O4_PROFILE_2_DRAFT)


with BuildPart() as part_4:
    add(part_3.part)

    # Ressalto-extrusão4 profile 2: add ressalto_extrus_o4_profile_2_tool
    add(ressalto_extrus_o4_profile_2_tool.part)

    # Esboço8 → Corte-extrusão1 (cut, symmetric)
    with BuildSketch(Plane(origin=(0, 0, 0), x_dir=(0, 0, -1), z_dir=(1, 0, 0))):
        Polygon((-52, 9.375644347), (-50.055570404, -8.854636007), (-52, -9.375644347), align=None)
    extrude(amount=CORTE_EXTRUS_O1_DEPTH, both=True, mode=Mode.SUBTRACT)

    # Esboço7 → Corte-extrusão2 (cut, symmetric)
    with BuildSketch(Plane(origin=(0, 0, 0), x_dir=(0, 0, -1), z_dir=(1, 0, 0))):
        Polygon((52, 9.375644347), (52, -9.375644347), (50.055570404, 8.854636007), align=None)
    extrude(amount=CORTE_EXTRUS_O2_DEPTH, both=True, mode=Mode.SUBTRACT)

    # Filete4
    # the kernel refuses this fillet: 8 mm, written as the material it takes off along each edge
    with BuildSketch(Plane(origin=(37.089156252, -8.854636007, 50.055570404), x_dir=(0, 0.2588190451025214, -0.9659258262890682), z_dir=(-1, 0, 0))) as filete4_piece_1:
        with BuildLine():
            CenterArc((9.188260198, -6.954360309), FILETE4_R, 119.623178498, 69.288708643)
            Line((1.284838224, -8.193683147), (1.126769784, -8.218469603))
            Line((1.126769784, -8.218469603), (-0.158068439, -0.024786457))
            Line((-0.158068439, -0.024786457), (0, 0.16))
            ThreePointArc((0, 0.16), (2.616955809, 0.16), (5.154824646, 0.139087206))
            Line((5.154824646, 0.139087206), (5.233911617, 0))
        make_face()
    extrude(amount=74.178312504, mode=Mode.SUBTRACT)
    with BuildSketch(Plane(origin=(-7.089156252, 8.854636007, -50.055570404), x_dir=(0, -0.25881904510252035, 0.9659258262890684), z_dir=(1, 0, 0)), Plane(origin=(-67.089156252, 8.854636007, -50.055570404), x_dir=(0, -0.2588190451025244, 0.9659258262890674), z_dir=(1, 0, 0))) as filete4_piece_2:
        with BuildLine():
            CenterArc((9.188260198, 6.954360309), FILETE4_R, 171.088112859, 69.288708643)
            Line((1.284838224, 8.193683147), (1.126769784, 8.218469603))
            Line((1.126769784, 8.218469603), (-0.158068439, 0.024786457))
            Line((-0.158068439, 0.024786457), (0, -0.16))
            ThreePointArc((0, -0.16), (2.616955809, -0.16), (5.154824646, -0.139087206))
            Line((5.154824646, -0.139087206), (5.233911617, 0))
        make_face()
    extrude(amount=74.178312504, mode=Mode.SUBTRACT)


solid = part_4.part
